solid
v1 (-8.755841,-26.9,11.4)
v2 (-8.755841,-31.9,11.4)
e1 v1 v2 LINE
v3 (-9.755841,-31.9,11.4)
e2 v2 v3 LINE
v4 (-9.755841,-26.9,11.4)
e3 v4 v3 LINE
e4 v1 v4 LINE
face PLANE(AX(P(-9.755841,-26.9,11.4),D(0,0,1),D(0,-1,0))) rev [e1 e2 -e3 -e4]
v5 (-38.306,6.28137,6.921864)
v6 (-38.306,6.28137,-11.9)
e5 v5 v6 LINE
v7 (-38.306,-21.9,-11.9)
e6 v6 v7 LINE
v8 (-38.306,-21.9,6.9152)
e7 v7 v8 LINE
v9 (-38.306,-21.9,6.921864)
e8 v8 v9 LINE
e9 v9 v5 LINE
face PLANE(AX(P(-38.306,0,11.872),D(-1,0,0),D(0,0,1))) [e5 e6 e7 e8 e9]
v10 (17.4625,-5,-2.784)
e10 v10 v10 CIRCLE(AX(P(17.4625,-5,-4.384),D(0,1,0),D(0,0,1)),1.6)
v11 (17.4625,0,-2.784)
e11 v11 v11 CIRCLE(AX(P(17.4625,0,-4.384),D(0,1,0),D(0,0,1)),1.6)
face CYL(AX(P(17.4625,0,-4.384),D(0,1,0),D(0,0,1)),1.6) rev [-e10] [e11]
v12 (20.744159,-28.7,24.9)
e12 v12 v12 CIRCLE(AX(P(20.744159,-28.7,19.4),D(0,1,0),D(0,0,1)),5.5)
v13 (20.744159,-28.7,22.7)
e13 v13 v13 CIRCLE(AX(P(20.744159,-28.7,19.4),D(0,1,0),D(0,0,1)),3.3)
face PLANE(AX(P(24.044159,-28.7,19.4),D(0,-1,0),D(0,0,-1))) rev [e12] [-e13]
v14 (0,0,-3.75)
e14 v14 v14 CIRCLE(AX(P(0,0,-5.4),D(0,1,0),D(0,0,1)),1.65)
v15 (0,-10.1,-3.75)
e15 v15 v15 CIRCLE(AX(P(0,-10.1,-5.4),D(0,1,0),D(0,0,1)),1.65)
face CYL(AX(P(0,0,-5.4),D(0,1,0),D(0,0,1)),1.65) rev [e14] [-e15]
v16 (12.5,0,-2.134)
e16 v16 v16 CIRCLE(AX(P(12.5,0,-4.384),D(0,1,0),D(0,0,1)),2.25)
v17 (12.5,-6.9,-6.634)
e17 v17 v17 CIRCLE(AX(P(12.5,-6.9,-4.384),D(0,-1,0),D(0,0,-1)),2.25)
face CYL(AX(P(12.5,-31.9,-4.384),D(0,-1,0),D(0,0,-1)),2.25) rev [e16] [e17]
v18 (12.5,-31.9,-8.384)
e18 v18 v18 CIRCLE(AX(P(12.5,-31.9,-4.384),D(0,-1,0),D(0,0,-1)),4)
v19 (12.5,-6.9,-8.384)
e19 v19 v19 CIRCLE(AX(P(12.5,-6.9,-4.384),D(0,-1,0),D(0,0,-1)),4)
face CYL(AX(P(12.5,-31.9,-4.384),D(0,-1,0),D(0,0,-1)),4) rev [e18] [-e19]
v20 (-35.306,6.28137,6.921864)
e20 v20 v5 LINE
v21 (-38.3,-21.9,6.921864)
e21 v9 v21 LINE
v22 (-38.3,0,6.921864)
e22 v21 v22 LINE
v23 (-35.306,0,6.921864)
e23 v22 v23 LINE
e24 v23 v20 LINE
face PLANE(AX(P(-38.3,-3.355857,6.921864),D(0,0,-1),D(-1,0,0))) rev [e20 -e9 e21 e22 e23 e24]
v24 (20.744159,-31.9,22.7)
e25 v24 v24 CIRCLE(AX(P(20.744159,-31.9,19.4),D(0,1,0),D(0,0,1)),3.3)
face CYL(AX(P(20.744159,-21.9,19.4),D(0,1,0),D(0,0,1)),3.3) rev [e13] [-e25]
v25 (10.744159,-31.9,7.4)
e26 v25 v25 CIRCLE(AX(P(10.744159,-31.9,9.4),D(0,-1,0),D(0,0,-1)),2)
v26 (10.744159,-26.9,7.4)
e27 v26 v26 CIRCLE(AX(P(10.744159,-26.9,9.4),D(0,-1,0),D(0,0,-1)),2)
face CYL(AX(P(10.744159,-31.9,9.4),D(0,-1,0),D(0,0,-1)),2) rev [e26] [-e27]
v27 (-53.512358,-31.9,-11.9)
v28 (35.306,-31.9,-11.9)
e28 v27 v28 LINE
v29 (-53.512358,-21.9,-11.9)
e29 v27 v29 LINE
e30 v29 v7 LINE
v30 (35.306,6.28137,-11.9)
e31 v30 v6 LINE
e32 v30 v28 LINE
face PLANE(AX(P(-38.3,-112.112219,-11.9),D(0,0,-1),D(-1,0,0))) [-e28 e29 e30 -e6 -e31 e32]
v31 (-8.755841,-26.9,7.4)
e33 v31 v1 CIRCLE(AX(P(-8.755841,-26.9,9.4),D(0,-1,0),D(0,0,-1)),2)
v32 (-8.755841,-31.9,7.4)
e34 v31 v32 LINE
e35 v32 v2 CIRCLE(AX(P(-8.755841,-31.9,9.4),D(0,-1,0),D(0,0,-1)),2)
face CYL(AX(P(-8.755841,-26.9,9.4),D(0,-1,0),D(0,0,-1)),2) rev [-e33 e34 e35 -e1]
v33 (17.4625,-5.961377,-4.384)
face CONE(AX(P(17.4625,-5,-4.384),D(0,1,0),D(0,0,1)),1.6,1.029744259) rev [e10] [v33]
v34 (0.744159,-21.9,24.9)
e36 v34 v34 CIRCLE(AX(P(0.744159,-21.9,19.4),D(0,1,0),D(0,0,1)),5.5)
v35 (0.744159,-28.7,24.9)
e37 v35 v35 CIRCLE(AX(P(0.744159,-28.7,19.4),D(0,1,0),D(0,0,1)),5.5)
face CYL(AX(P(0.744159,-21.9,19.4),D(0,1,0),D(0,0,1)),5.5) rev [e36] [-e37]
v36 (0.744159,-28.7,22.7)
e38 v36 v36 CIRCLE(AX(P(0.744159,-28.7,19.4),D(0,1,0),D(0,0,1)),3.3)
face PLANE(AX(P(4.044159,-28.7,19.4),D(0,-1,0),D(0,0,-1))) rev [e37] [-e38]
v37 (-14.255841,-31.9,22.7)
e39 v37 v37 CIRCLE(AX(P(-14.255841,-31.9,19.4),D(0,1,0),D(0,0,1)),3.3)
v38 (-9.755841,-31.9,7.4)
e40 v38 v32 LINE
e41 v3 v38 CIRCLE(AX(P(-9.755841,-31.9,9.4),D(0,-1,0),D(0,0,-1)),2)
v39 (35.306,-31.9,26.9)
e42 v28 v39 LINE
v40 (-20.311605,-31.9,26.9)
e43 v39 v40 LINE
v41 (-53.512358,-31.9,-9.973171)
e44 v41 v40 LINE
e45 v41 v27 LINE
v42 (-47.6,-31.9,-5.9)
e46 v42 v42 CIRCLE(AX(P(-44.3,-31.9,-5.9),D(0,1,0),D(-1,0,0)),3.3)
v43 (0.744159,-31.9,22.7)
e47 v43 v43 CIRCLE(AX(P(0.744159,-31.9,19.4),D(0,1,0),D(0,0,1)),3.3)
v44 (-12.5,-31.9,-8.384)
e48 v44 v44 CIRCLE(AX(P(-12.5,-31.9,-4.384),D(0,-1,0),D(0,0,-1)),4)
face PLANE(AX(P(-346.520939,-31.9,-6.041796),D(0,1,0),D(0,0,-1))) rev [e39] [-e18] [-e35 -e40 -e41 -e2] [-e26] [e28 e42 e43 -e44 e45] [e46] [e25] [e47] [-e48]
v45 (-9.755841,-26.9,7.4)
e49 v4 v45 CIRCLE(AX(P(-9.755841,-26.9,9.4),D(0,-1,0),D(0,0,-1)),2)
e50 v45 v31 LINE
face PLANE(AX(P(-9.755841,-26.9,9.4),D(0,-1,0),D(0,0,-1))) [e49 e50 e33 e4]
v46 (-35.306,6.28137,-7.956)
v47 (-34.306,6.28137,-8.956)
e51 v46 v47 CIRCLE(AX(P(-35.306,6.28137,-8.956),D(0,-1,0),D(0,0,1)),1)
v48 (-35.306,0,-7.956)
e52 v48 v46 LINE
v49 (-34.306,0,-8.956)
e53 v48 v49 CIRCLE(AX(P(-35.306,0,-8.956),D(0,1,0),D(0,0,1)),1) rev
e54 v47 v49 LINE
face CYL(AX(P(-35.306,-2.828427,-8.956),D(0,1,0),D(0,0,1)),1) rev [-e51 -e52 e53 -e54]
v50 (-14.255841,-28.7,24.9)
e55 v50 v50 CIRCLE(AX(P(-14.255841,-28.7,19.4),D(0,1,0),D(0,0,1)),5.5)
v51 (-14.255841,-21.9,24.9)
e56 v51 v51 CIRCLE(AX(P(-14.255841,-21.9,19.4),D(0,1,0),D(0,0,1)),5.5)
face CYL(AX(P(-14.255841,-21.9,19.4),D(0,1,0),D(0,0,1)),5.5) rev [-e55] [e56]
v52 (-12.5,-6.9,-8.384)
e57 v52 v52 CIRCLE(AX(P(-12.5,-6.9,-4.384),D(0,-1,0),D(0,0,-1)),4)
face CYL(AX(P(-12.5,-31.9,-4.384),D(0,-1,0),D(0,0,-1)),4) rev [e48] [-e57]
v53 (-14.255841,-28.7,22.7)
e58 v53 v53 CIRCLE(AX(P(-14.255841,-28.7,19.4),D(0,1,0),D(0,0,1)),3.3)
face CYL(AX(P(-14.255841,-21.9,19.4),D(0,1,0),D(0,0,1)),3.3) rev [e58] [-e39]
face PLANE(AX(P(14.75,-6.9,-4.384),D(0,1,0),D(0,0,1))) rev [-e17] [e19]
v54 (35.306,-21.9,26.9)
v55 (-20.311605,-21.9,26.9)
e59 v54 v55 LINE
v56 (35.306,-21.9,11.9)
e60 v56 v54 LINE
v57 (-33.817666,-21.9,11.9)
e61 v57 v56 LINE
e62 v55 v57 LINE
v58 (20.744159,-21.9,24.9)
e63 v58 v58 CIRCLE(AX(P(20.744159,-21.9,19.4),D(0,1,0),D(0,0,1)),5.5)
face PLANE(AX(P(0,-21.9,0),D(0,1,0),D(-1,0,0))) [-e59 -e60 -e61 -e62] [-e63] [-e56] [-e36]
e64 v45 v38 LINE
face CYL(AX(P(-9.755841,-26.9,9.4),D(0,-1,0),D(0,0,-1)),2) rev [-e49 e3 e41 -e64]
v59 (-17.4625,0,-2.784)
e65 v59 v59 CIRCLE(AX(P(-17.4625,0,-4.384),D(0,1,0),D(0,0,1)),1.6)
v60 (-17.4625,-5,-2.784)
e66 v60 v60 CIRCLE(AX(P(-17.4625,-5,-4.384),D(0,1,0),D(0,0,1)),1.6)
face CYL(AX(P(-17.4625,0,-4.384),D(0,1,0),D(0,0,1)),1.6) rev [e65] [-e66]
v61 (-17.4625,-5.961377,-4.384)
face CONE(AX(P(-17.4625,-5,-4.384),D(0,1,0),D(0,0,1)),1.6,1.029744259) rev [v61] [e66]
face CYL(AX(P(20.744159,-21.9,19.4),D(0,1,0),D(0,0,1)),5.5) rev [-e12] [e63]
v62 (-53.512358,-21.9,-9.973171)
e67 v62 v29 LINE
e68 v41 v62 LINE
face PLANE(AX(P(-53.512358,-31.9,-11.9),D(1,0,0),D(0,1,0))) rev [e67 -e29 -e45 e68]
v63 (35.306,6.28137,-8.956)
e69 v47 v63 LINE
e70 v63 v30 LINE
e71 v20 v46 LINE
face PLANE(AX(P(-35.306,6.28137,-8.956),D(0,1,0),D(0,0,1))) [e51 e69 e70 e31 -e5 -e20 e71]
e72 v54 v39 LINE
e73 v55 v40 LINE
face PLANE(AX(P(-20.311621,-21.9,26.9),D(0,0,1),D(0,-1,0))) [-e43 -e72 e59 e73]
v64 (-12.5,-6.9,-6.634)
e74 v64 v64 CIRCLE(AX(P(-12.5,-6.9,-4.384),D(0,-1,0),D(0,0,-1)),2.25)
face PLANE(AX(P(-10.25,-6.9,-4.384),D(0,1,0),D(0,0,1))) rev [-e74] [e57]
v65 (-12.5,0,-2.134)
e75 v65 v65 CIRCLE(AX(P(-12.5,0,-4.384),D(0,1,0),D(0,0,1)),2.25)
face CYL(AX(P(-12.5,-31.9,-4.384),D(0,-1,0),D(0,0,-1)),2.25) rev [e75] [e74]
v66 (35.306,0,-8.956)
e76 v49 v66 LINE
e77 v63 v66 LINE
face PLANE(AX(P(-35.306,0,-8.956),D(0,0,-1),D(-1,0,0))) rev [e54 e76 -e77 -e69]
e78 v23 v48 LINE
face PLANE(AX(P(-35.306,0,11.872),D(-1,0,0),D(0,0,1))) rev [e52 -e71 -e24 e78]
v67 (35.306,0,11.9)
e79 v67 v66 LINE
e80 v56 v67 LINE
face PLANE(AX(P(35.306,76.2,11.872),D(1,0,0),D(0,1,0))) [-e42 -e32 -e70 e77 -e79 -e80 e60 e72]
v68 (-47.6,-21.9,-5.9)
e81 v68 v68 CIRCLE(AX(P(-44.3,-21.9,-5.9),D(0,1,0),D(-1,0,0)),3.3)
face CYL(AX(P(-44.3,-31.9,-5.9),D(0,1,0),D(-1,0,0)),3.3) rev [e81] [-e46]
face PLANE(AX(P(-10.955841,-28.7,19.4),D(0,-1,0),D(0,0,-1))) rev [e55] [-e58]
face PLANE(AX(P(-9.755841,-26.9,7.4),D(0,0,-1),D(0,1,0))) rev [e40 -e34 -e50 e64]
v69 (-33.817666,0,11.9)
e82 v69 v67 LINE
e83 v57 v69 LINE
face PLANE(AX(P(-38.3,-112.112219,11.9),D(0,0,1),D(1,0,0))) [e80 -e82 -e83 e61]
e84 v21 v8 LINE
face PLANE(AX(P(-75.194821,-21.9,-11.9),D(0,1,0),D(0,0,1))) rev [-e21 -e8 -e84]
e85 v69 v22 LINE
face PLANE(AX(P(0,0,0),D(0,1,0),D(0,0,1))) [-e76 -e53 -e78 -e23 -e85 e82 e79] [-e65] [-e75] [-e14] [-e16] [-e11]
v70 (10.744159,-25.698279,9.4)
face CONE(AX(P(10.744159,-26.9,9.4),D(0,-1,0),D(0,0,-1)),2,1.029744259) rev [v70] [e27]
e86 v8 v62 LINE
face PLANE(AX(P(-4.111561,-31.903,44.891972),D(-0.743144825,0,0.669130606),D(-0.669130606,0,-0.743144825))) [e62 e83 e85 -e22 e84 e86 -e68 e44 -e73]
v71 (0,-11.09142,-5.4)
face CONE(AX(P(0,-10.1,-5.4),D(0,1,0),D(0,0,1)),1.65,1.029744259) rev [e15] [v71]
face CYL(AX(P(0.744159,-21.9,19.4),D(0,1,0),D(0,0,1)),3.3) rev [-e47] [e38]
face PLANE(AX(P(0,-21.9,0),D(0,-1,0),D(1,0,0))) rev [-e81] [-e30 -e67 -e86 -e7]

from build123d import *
from build123d.topology import SkipClean

# Parameters (mm, degrees)
SKETCH_1_W                = 76.6
SKETCH_1_H                = 23.8
EXTRUDE_1_DEPTH           = 31.899999991
HOLE_WIZARD_M4_1_D        = 3.3
HOLE_WIZARD_M4_1_DEPTH    = 10.1
HOLE_WIZARD_M4_1_TIP      = 0.991420021
SKETCH_5_W                = 23.8
SKETCH_5_H                = 2.281370048
EXTRUDE_2_DEPTH           = 2.994
SKETCH_6_W                = 76.6
SKETCH_6_H                = 2.281370048
EXTRUDE_3_DEPTH           = 2.944
CUT_EXTRUDE_START         = -2.994
SKETCH_7_W                = 26.992148155
SKETCH_7_H                = 47.339562986
CUT_EXTRUDE_1_DEPTH       = 2.994
EXTRUDE_4_DEPTH           = 10
HOLE_WIZARD_3_D           = 6.6
HOLE_WIZARD_3_CBORE_D     = 11
HOLE_WIZARD_3_CBORE_DEPTH = 6.8
SKETCH_21_R               = 3.3
CUT_EXTRUDE_6_DEPTH       = 67.034934903
MM_2_D                    = 4
MM_2_DEPTH                = 5
MM_2_TIP                  = 1.201721238
CUT_EXTRUDE_7_DEPTH       = 5
SKETCH_26_W               = 46.053862543
SKETCH_26_H               = 10
CUT_EXTRUDE_8_DEPTH       = 76.924939501
CUT_EXTRUDE_9_DEPTH       = 67.034934903
SKETCH_29_R               = 1
CUT_EXTRUDE_10_DEPTH      = 2.281370048
EXTRUDE_START             = 4
EXTRUDE_5_DEPTH           = 4
CUT_EXTRUDE_11_DEPTH      = 0.5
EXTRUDE_6_DEPTH           = 0.499988059
CUT_EXTRUDE_12_DEPTH      = 28.181370038
SKETCH_35_W               = 0.334557313
SKETCH_35_H               = 10
CUT_EXTRUDE_13_DEPTH      = 100.522674932
CHAMFER_1_SIZE            = 2
HOLE_WIZARD_4_D           = 4.5
HOLE_WIZARD_4_CBORE_D     = 8
HOLE_WIZARD_4_CBORE_DEPTH = 25
CUT_EXTRUDE_14_DEPTH      = 67.269104052
CUT_EXTRUDE_15_DEPTH      = 6.281370048
EXTRUDE_9_DEPTH           = 0.006


with BuildPart() as part:
    # 草图1 → 凸台-拉伸1 (new body)
    with BuildSketch(Plane(origin=(0, 0, 0), x_dir=(1, 0, 0), z_dir=(0, 1, 0))):
        Rectangle(SKETCH_1_W, SKETCH_1_H)
    extrude(amount=-EXTRUDE_1_DEPTH)

    # M4 螺纹孔1
    with Locations(Plane(origin=(0, 0, -5.4), x_dir=(0, 0, 1), z_dir=(0, 1, 0))):
        with Locations((0, 0)):
            Hole(HOLE_WIZARD_M4_1_D / 2, depth=HOLE_WIZARD_M4_1_DEPTH)
            with Locations((0, 0, -(HOLE_WIZARD_M4_1_DEPTH + HOLE_WIZARD_M4_1_TIP / 2))):  # 118° drill point
                Cone(0, HOLE_WIZARD_M4_1_D / 2, HOLE_WIZARD_M4_1_TIP, mode=Mode.SUBTRACT)

    # 草图5 → 凸台-拉伸2 (add)
    with BuildSketch(Plane.ZY.offset(38.3)):
        with Locations((0, 1.140685024)):
            Rectangle(SKETCH_5_W, SKETCH_5_H)
    extrude(amount=-EXTRUDE_2_DEPTH)

    # 草图6 → 凸台-拉伸3 (add)
    with BuildSketch(Plane(origin=(0, 0, -11.9), x_dir=(-1, 0, 0), z_dir=(0, 0, -1))):
        with Locations((0, 1.140685024)):
            Rectangle(SKETCH_6_W, SKETCH_6_H)
    extrude(amount=-EXTRUDE_3_DEPTH)

    # 草图7 → 切除-拉伸1 (cut)
    with BuildSketch(Plane(origin=(38.3, 0, 0), x_dir=(0, 0, -1), z_dir=(1, 0, 0)).offset(CUT_EXTRUDE_START)):
        with Locations((-1.596074077, -8.230218498)):
            Rectangle(SKETCH_7_W, SKETCH_7_H)
    extrude(amount=CUT_EXTRUDE_1_DEPTH, mode=Mode.SUBTRACT)

    # 草图9 → 大小mm 暗销孔1 (revolve, cut)
    with BuildSketch(Plane(origin=(17.4625, 0, -4.384), x_dir=(0, 0, 1), z_dir=(1, 0, 0))):
        Polygon((0, 0), (0, 5.96137699), (1.6, 5), (1.6, 0), align=None)
    mm_1 = revolve(axis=Axis((17.4625, 6.35, -4.384), (0, -1, 0)), mode=Mode.SUBTRACT)

    # 镜向3: 大小mm 暗销孔1 across plane
    add(mm_1.mirror(Plane(origin=(0, 0, 0), x_dir=(0, 0, 1), z_dir=(1, 0, 0))), mode=Mode.SUBTRACT)

    # 草图16 → 凸台-拉伸4 (add)
    with BuildSketch(Plane.XZ.offset(31.899999991)):
        Polygon((-38.3, 6.921881597), (-55.247298311, -11.9), (-38.3, -11.9), align=None)
        Polygon((-33.817682057, 11.9), (-20.311621392, 26.9), (35.306, 26.9), (35.306, 11.9), align=None)
    extrude(amount=-EXTRUDE_4_DEPTH)

    # 打孔尺寸(%根据)内六角圆柱头螺钉的类型3 (through all)
    with Locations(Plane(origin=(-14.255841028, -21.899999991, 19.4), x_dir=(1, 0, 0), z_dir=(0, 1, 0))):
        with Locations((0, 0), (15, 0), (35, 0)):
            CounterBoreHole(HOLE_WIZARD_3_D / 2, HOLE_WIZARD_3_CBORE_D / 2, HOLE_WIZARD_3_CBORE_DEPTH)

    # 草图21 → 切除-拉伸6 (cut, through all)
    with BuildSketch(Plane(origin=(0, -21.899999991, 0), x_dir=(1, 0, 0), z_dir=(0, 1, 0))):
        with Locations(Location((-44.3, 5.9, 0), (0, 0, 180))):
            Circle(SKETCH_21_R)
    extrude(amount=-CUT_EXTRUDE_6_DEPTH, mode=Mode.SUBTRACT)

    # 大小mm 暗销孔2
    with Locations(Plane(origin=(10.744158972, -31.899999991, 9.4), x_dir=(0, 0, -1), z_dir=(0, -1, 0))):
        with Locations((0, 0)):
            Hole(MM_2_D / 2, depth=MM_2_DEPTH)
            with Locations((0, 0, -(MM_2_DEPTH + MM_2_TIP / 2))):  # 118° drill point
                Cone(0, MM_2_D / 2, MM_2_TIP, mode=Mode.SUBTRACT)

    # 草图25 → 切除-拉伸7 (cut)
    with BuildSketch(Plane.XZ.offset(31.899999991)):
        with BuildLine():
            Line((-9.755841028, 11.4), (-8.755841028, 11.4))
            ThreePointArc((-8.755841028, 11.4), (-6.755841028, 9.4), (-8.755841028, 7.4))
            Line((-8.755841028, 7.4), (-9.755841028, 7.4))
            ThreePointArc((-9.755841028, 7.4), (-11.755841028, 9.4), (-9.755841028, 11.4))
        make_face()
    extrude(amount=-CUT_EXTRUDE_7_DEPTH, mode=Mode.SUBTRACT)

    # 草图26 → 切除-拉伸8 (cut, through all)
    with BuildSketch(Plane(origin=(-24.593701474, 0, 22.144268272), x_dir=(0.6691306063588817, 0, 0.7431448254773731), z_dir=(-0.7431448254773731, 0, 0.6691306063588817))):
        with Locations((-11.827706241, -26.899999991)):
            Rectangle(SKETCH_26_W, SKETCH_26_H)
    extrude(amount=CUT_EXTRUDE_8_DEPTH, mode=Mode.SUBTRACT)

    # 草图27 → 切除-拉伸9 (cut, through all)
    with BuildSketch(Plane.XZ.offset(21.899999991)):
        Polygon((-38.3, 6.921881597), (-33.817682057, 11.9), (-38.3, 11.9), align=None)
    extrude(amount=-CUT_EXTRUDE_9_DEPTH, mode=Mode.SUBTRACT)

    # 草图29 → 切除-拉伸10 (cut)
    with BuildSketch(Plane(origin=(0, 2.281370048, 0), x_dir=(1, 0, 0), z_dir=(0, 1, 0))):
        with Locations((-35.306, 8.956)):
            Circle(SKETCH_29_R)
    extrude(amount=-CUT_EXTRUDE_10_DEPTH, mode=Mode.SUBTRACT)

    # 草图31 → 凸台-拉伸5 (add)
    with SkipClean():  # the faces are left unmerged after this step: merging them gives an invalid solid
        with BuildSketch(Plane(origin=(0, 2.281370048, 0), x_dir=(1, 0, 0), z_dir=(0, 1, 0)).offset(EXTRUDE_START)):
            with BuildLine():
                Line((-34.306, 8.956), (35.306, 8.956))
                Line((35.306, 8.956), (35.306, 11.9))
                Line((35.306, 11.9), (-38.3, 11.9))
                Line((-38.3, 11.9), (-38.3, -6.921881597))
                Line((-38.3, -6.921881597), (-35.306, -10.247055466))
                Line((-35.306, -10.247055466), (-35.306, 7.956))
                ThreePointArc((-35.306, 7.956), (-36.013106781, 9.663106781), (-34.306, 8.956))
            make_face()
        extrude(amount=-EXTRUDE_5_DEPTH)

    # 草图32 → 切除-拉伸11 (cut)
    with SkipClean():  # the faces are left unmerged after this step: merging them gives an invalid solid
        with BuildSketch(Plane(origin=(-24.593701474, 0, 22.144268272), x_dir=(0.6691306063588817, 0, 0.7431448254773731), z_dir=(-0.7431448254773731, 0, 0.6691306063588817))):
            Polygon((-23.813531784, -21.899999991), (-45.811081642, -21.899999991), (-45.811081642, -31.899999991), (7.49870663, -31.899999991), (7.49870663, -21.899999991), (-11.951824765, -21.899999991), (-11.951824765, 0), (-16.009278942, 0), (-16.009278942, 6.281370048), (-23.813531784, 6.281370048), align=None)
        extrude(amount=-CUT_EXTRUDE_11_DEPTH, mode=Mode.SUBTRACT)

    # 草图33 → 凸台-拉伸6 (add)
    with SkipClean():  # the faces are left unmerged after this step: merging them gives an invalid solid
        with BuildSketch(Plane(origin=(-24.222129061, 0, 21.809702968), x_dir=(0.6691306063588818, 0, 0.743144825477373), z_dir=(-0.743144825477373, 0, 0.6691306063588818))):
            Polygon((-45.36087962, -21.899999991), (-45.36087962, -31.899999991), (6.849670289, -31.899999991), (6.849670289, -21.899999991), (-13.334820655, -21.899999991), (-13.334820655, 0), (-16.564585199, 0), (-16.564585199, 6.281370048), (-21.03904799, 6.281370048), (-21.03904799, -21.899999991), align=None)
        extrude(amount=EXTRUDE_6_DEPTH)

    # 草图34 → 切除-拉伸12 (cut)
    with SkipClean():  # the faces are left unmerged after this step: merging them gives an invalid solid
        with BuildSketch(Plane(origin=(0, 6.281370048, 0), x_dir=(1, 0, 0), z_dir=(0, 1, 0))):
            Polygon((-38.3, -6.174643322), (-38.3, -6.921863751), (-38.671563539, -6.509200635), align=None)
            Polygon((-33.144865692, -11.9), (-33.817665989, -11.9), (-33.516429231, -12.234557313), align=None)
        extrude(amount=-CUT_EXTRUDE_12_DEPTH, mode=Mode.SUBTRACT)

    # 草图35 → 切除-拉伸13 (cut, through all)
    with SkipClean():  # the faces are left unmerged after this step: merging them gives an invalid solid
        with BuildSketch(Plane(origin=(35.306, 0, 0), x_dir=(0, 0, -1), z_dir=(1, 0, 0))):
            with Locations((-27.067278657, -26.899999991)):
                Rectangle(SKETCH_35_W, SKETCH_35_H)
        extrude(amount=-CUT_EXTRUDE_13_DEPTH, mode=Mode.SUBTRACT)

    # 倒角1
    # the kernel refuses this chamfer: 2 mm, written as the material it takes off along each edge
    with BuildSketch(Plane(origin=(-54.946045485, -16.756634015, -11.565442687), x_dir=(0.7244655223975927, 0, -0.6893110378176047), z_dir=(0, -1, 0))) as chamfer_1_piece_1:
        Polygon((CHAMFER_1_SIZE * 0.999621916911, CHAMFER_1_SIZE * 0.0274958766106), (-CHAMFER_1_SIZE * 0.0274958766106, CHAMFER_1_SIZE * 0.999621916911), (0, 0), align=None)
    extrude(amount=20.286731952, mode=Mode.SUBTRACT)
    with BuildSketch(Plane(origin=(-35.677563539, 0, 9.834374504), x_dir=(-0.6893110378176056, 0, -0.7244655223975918), z_dir=(0, 1, 0))) as chamfer_1_piece_2:
        Polygon((CHAMFER_1_SIZE * 0.999621916911, -CHAMFER_1_SIZE * 0.0274958766106), (-CHAMFER_1_SIZE * 0.0274958766106, -CHAMFER_1_SIZE * 0.999621916911), (0, 0), align=None)
    extrude(amount=11.424736024, mode=Mode.SUBTRACT)

    # 打孔尺寸(%根据)内六角圆柱头螺钉的类型4 (through all)
    with Locations(Plane(origin=(12.5, -31.899999991, -4.384), x_dir=(0, 0, -1), z_dir=(0, -1, 0))):
        with Locations((0, 0)):
            hole_wizard_4 = CounterBoreHole(HOLE_WIZARD_4_D / 2, HOLE_WIZARD_4_CBORE_D / 2, HOLE_WIZARD_4_CBORE_DEPTH)

    # 镜向4: 打孔尺寸(%根据)内六角圆柱头螺钉的类型4 across plane
    add(hole_wizard_4.mirror(Plane(origin=(0, 0, 0), x_dir=(0, 0, 1), z_dir=(1, 0, 0))), mode=Mode.SUBTRACT)

    # 草图39 → 切除-拉伸14 (cut, through all)
    with BuildSketch(Plane(origin=(0, -21.899999991, 0), x_dir=(1, 0, 0), z_dir=(0, 1, 0))):
        Polygon((-53.512357727, 11.9), (-53.512357727, 9.97317112), (-53.607784272, 10.079153036), align=None)
    extrude(amount=-CUT_EXTRUDE_14_DEPTH, mode=Mode.SUBTRACT)

    # 草图40 → 切除-拉伸15 (cut)
    with BuildSketch(Plane(origin=(0, 6.281370048, 0), x_dir=(1, 0, 0), z_dir=(0, 1, 0))):
        Polygon((-38.3, -6.921863751), (-35.306, -6.921863751), (-35.306, -8.437692972), (-37.015824752, -8.348084853), align=None)
    extrude(amount=-CUT_EXTRUDE_15_DEPTH, mode=Mode.SUBTRACT)

    # 草图42 → 凸台-拉伸9 (add)
    with BuildSketch(Plane.ZY.offset(38.3)):
        Polygon((-11.9, -21.899999991), (6.921863751, -21.899999991), (6.921863751, 0), (6.921863751, 6.281370048), (-11.9, 6.281370048), align=None)
    extrude(amount=EXTRUDE_9_DEPTH)


solid = part.part
